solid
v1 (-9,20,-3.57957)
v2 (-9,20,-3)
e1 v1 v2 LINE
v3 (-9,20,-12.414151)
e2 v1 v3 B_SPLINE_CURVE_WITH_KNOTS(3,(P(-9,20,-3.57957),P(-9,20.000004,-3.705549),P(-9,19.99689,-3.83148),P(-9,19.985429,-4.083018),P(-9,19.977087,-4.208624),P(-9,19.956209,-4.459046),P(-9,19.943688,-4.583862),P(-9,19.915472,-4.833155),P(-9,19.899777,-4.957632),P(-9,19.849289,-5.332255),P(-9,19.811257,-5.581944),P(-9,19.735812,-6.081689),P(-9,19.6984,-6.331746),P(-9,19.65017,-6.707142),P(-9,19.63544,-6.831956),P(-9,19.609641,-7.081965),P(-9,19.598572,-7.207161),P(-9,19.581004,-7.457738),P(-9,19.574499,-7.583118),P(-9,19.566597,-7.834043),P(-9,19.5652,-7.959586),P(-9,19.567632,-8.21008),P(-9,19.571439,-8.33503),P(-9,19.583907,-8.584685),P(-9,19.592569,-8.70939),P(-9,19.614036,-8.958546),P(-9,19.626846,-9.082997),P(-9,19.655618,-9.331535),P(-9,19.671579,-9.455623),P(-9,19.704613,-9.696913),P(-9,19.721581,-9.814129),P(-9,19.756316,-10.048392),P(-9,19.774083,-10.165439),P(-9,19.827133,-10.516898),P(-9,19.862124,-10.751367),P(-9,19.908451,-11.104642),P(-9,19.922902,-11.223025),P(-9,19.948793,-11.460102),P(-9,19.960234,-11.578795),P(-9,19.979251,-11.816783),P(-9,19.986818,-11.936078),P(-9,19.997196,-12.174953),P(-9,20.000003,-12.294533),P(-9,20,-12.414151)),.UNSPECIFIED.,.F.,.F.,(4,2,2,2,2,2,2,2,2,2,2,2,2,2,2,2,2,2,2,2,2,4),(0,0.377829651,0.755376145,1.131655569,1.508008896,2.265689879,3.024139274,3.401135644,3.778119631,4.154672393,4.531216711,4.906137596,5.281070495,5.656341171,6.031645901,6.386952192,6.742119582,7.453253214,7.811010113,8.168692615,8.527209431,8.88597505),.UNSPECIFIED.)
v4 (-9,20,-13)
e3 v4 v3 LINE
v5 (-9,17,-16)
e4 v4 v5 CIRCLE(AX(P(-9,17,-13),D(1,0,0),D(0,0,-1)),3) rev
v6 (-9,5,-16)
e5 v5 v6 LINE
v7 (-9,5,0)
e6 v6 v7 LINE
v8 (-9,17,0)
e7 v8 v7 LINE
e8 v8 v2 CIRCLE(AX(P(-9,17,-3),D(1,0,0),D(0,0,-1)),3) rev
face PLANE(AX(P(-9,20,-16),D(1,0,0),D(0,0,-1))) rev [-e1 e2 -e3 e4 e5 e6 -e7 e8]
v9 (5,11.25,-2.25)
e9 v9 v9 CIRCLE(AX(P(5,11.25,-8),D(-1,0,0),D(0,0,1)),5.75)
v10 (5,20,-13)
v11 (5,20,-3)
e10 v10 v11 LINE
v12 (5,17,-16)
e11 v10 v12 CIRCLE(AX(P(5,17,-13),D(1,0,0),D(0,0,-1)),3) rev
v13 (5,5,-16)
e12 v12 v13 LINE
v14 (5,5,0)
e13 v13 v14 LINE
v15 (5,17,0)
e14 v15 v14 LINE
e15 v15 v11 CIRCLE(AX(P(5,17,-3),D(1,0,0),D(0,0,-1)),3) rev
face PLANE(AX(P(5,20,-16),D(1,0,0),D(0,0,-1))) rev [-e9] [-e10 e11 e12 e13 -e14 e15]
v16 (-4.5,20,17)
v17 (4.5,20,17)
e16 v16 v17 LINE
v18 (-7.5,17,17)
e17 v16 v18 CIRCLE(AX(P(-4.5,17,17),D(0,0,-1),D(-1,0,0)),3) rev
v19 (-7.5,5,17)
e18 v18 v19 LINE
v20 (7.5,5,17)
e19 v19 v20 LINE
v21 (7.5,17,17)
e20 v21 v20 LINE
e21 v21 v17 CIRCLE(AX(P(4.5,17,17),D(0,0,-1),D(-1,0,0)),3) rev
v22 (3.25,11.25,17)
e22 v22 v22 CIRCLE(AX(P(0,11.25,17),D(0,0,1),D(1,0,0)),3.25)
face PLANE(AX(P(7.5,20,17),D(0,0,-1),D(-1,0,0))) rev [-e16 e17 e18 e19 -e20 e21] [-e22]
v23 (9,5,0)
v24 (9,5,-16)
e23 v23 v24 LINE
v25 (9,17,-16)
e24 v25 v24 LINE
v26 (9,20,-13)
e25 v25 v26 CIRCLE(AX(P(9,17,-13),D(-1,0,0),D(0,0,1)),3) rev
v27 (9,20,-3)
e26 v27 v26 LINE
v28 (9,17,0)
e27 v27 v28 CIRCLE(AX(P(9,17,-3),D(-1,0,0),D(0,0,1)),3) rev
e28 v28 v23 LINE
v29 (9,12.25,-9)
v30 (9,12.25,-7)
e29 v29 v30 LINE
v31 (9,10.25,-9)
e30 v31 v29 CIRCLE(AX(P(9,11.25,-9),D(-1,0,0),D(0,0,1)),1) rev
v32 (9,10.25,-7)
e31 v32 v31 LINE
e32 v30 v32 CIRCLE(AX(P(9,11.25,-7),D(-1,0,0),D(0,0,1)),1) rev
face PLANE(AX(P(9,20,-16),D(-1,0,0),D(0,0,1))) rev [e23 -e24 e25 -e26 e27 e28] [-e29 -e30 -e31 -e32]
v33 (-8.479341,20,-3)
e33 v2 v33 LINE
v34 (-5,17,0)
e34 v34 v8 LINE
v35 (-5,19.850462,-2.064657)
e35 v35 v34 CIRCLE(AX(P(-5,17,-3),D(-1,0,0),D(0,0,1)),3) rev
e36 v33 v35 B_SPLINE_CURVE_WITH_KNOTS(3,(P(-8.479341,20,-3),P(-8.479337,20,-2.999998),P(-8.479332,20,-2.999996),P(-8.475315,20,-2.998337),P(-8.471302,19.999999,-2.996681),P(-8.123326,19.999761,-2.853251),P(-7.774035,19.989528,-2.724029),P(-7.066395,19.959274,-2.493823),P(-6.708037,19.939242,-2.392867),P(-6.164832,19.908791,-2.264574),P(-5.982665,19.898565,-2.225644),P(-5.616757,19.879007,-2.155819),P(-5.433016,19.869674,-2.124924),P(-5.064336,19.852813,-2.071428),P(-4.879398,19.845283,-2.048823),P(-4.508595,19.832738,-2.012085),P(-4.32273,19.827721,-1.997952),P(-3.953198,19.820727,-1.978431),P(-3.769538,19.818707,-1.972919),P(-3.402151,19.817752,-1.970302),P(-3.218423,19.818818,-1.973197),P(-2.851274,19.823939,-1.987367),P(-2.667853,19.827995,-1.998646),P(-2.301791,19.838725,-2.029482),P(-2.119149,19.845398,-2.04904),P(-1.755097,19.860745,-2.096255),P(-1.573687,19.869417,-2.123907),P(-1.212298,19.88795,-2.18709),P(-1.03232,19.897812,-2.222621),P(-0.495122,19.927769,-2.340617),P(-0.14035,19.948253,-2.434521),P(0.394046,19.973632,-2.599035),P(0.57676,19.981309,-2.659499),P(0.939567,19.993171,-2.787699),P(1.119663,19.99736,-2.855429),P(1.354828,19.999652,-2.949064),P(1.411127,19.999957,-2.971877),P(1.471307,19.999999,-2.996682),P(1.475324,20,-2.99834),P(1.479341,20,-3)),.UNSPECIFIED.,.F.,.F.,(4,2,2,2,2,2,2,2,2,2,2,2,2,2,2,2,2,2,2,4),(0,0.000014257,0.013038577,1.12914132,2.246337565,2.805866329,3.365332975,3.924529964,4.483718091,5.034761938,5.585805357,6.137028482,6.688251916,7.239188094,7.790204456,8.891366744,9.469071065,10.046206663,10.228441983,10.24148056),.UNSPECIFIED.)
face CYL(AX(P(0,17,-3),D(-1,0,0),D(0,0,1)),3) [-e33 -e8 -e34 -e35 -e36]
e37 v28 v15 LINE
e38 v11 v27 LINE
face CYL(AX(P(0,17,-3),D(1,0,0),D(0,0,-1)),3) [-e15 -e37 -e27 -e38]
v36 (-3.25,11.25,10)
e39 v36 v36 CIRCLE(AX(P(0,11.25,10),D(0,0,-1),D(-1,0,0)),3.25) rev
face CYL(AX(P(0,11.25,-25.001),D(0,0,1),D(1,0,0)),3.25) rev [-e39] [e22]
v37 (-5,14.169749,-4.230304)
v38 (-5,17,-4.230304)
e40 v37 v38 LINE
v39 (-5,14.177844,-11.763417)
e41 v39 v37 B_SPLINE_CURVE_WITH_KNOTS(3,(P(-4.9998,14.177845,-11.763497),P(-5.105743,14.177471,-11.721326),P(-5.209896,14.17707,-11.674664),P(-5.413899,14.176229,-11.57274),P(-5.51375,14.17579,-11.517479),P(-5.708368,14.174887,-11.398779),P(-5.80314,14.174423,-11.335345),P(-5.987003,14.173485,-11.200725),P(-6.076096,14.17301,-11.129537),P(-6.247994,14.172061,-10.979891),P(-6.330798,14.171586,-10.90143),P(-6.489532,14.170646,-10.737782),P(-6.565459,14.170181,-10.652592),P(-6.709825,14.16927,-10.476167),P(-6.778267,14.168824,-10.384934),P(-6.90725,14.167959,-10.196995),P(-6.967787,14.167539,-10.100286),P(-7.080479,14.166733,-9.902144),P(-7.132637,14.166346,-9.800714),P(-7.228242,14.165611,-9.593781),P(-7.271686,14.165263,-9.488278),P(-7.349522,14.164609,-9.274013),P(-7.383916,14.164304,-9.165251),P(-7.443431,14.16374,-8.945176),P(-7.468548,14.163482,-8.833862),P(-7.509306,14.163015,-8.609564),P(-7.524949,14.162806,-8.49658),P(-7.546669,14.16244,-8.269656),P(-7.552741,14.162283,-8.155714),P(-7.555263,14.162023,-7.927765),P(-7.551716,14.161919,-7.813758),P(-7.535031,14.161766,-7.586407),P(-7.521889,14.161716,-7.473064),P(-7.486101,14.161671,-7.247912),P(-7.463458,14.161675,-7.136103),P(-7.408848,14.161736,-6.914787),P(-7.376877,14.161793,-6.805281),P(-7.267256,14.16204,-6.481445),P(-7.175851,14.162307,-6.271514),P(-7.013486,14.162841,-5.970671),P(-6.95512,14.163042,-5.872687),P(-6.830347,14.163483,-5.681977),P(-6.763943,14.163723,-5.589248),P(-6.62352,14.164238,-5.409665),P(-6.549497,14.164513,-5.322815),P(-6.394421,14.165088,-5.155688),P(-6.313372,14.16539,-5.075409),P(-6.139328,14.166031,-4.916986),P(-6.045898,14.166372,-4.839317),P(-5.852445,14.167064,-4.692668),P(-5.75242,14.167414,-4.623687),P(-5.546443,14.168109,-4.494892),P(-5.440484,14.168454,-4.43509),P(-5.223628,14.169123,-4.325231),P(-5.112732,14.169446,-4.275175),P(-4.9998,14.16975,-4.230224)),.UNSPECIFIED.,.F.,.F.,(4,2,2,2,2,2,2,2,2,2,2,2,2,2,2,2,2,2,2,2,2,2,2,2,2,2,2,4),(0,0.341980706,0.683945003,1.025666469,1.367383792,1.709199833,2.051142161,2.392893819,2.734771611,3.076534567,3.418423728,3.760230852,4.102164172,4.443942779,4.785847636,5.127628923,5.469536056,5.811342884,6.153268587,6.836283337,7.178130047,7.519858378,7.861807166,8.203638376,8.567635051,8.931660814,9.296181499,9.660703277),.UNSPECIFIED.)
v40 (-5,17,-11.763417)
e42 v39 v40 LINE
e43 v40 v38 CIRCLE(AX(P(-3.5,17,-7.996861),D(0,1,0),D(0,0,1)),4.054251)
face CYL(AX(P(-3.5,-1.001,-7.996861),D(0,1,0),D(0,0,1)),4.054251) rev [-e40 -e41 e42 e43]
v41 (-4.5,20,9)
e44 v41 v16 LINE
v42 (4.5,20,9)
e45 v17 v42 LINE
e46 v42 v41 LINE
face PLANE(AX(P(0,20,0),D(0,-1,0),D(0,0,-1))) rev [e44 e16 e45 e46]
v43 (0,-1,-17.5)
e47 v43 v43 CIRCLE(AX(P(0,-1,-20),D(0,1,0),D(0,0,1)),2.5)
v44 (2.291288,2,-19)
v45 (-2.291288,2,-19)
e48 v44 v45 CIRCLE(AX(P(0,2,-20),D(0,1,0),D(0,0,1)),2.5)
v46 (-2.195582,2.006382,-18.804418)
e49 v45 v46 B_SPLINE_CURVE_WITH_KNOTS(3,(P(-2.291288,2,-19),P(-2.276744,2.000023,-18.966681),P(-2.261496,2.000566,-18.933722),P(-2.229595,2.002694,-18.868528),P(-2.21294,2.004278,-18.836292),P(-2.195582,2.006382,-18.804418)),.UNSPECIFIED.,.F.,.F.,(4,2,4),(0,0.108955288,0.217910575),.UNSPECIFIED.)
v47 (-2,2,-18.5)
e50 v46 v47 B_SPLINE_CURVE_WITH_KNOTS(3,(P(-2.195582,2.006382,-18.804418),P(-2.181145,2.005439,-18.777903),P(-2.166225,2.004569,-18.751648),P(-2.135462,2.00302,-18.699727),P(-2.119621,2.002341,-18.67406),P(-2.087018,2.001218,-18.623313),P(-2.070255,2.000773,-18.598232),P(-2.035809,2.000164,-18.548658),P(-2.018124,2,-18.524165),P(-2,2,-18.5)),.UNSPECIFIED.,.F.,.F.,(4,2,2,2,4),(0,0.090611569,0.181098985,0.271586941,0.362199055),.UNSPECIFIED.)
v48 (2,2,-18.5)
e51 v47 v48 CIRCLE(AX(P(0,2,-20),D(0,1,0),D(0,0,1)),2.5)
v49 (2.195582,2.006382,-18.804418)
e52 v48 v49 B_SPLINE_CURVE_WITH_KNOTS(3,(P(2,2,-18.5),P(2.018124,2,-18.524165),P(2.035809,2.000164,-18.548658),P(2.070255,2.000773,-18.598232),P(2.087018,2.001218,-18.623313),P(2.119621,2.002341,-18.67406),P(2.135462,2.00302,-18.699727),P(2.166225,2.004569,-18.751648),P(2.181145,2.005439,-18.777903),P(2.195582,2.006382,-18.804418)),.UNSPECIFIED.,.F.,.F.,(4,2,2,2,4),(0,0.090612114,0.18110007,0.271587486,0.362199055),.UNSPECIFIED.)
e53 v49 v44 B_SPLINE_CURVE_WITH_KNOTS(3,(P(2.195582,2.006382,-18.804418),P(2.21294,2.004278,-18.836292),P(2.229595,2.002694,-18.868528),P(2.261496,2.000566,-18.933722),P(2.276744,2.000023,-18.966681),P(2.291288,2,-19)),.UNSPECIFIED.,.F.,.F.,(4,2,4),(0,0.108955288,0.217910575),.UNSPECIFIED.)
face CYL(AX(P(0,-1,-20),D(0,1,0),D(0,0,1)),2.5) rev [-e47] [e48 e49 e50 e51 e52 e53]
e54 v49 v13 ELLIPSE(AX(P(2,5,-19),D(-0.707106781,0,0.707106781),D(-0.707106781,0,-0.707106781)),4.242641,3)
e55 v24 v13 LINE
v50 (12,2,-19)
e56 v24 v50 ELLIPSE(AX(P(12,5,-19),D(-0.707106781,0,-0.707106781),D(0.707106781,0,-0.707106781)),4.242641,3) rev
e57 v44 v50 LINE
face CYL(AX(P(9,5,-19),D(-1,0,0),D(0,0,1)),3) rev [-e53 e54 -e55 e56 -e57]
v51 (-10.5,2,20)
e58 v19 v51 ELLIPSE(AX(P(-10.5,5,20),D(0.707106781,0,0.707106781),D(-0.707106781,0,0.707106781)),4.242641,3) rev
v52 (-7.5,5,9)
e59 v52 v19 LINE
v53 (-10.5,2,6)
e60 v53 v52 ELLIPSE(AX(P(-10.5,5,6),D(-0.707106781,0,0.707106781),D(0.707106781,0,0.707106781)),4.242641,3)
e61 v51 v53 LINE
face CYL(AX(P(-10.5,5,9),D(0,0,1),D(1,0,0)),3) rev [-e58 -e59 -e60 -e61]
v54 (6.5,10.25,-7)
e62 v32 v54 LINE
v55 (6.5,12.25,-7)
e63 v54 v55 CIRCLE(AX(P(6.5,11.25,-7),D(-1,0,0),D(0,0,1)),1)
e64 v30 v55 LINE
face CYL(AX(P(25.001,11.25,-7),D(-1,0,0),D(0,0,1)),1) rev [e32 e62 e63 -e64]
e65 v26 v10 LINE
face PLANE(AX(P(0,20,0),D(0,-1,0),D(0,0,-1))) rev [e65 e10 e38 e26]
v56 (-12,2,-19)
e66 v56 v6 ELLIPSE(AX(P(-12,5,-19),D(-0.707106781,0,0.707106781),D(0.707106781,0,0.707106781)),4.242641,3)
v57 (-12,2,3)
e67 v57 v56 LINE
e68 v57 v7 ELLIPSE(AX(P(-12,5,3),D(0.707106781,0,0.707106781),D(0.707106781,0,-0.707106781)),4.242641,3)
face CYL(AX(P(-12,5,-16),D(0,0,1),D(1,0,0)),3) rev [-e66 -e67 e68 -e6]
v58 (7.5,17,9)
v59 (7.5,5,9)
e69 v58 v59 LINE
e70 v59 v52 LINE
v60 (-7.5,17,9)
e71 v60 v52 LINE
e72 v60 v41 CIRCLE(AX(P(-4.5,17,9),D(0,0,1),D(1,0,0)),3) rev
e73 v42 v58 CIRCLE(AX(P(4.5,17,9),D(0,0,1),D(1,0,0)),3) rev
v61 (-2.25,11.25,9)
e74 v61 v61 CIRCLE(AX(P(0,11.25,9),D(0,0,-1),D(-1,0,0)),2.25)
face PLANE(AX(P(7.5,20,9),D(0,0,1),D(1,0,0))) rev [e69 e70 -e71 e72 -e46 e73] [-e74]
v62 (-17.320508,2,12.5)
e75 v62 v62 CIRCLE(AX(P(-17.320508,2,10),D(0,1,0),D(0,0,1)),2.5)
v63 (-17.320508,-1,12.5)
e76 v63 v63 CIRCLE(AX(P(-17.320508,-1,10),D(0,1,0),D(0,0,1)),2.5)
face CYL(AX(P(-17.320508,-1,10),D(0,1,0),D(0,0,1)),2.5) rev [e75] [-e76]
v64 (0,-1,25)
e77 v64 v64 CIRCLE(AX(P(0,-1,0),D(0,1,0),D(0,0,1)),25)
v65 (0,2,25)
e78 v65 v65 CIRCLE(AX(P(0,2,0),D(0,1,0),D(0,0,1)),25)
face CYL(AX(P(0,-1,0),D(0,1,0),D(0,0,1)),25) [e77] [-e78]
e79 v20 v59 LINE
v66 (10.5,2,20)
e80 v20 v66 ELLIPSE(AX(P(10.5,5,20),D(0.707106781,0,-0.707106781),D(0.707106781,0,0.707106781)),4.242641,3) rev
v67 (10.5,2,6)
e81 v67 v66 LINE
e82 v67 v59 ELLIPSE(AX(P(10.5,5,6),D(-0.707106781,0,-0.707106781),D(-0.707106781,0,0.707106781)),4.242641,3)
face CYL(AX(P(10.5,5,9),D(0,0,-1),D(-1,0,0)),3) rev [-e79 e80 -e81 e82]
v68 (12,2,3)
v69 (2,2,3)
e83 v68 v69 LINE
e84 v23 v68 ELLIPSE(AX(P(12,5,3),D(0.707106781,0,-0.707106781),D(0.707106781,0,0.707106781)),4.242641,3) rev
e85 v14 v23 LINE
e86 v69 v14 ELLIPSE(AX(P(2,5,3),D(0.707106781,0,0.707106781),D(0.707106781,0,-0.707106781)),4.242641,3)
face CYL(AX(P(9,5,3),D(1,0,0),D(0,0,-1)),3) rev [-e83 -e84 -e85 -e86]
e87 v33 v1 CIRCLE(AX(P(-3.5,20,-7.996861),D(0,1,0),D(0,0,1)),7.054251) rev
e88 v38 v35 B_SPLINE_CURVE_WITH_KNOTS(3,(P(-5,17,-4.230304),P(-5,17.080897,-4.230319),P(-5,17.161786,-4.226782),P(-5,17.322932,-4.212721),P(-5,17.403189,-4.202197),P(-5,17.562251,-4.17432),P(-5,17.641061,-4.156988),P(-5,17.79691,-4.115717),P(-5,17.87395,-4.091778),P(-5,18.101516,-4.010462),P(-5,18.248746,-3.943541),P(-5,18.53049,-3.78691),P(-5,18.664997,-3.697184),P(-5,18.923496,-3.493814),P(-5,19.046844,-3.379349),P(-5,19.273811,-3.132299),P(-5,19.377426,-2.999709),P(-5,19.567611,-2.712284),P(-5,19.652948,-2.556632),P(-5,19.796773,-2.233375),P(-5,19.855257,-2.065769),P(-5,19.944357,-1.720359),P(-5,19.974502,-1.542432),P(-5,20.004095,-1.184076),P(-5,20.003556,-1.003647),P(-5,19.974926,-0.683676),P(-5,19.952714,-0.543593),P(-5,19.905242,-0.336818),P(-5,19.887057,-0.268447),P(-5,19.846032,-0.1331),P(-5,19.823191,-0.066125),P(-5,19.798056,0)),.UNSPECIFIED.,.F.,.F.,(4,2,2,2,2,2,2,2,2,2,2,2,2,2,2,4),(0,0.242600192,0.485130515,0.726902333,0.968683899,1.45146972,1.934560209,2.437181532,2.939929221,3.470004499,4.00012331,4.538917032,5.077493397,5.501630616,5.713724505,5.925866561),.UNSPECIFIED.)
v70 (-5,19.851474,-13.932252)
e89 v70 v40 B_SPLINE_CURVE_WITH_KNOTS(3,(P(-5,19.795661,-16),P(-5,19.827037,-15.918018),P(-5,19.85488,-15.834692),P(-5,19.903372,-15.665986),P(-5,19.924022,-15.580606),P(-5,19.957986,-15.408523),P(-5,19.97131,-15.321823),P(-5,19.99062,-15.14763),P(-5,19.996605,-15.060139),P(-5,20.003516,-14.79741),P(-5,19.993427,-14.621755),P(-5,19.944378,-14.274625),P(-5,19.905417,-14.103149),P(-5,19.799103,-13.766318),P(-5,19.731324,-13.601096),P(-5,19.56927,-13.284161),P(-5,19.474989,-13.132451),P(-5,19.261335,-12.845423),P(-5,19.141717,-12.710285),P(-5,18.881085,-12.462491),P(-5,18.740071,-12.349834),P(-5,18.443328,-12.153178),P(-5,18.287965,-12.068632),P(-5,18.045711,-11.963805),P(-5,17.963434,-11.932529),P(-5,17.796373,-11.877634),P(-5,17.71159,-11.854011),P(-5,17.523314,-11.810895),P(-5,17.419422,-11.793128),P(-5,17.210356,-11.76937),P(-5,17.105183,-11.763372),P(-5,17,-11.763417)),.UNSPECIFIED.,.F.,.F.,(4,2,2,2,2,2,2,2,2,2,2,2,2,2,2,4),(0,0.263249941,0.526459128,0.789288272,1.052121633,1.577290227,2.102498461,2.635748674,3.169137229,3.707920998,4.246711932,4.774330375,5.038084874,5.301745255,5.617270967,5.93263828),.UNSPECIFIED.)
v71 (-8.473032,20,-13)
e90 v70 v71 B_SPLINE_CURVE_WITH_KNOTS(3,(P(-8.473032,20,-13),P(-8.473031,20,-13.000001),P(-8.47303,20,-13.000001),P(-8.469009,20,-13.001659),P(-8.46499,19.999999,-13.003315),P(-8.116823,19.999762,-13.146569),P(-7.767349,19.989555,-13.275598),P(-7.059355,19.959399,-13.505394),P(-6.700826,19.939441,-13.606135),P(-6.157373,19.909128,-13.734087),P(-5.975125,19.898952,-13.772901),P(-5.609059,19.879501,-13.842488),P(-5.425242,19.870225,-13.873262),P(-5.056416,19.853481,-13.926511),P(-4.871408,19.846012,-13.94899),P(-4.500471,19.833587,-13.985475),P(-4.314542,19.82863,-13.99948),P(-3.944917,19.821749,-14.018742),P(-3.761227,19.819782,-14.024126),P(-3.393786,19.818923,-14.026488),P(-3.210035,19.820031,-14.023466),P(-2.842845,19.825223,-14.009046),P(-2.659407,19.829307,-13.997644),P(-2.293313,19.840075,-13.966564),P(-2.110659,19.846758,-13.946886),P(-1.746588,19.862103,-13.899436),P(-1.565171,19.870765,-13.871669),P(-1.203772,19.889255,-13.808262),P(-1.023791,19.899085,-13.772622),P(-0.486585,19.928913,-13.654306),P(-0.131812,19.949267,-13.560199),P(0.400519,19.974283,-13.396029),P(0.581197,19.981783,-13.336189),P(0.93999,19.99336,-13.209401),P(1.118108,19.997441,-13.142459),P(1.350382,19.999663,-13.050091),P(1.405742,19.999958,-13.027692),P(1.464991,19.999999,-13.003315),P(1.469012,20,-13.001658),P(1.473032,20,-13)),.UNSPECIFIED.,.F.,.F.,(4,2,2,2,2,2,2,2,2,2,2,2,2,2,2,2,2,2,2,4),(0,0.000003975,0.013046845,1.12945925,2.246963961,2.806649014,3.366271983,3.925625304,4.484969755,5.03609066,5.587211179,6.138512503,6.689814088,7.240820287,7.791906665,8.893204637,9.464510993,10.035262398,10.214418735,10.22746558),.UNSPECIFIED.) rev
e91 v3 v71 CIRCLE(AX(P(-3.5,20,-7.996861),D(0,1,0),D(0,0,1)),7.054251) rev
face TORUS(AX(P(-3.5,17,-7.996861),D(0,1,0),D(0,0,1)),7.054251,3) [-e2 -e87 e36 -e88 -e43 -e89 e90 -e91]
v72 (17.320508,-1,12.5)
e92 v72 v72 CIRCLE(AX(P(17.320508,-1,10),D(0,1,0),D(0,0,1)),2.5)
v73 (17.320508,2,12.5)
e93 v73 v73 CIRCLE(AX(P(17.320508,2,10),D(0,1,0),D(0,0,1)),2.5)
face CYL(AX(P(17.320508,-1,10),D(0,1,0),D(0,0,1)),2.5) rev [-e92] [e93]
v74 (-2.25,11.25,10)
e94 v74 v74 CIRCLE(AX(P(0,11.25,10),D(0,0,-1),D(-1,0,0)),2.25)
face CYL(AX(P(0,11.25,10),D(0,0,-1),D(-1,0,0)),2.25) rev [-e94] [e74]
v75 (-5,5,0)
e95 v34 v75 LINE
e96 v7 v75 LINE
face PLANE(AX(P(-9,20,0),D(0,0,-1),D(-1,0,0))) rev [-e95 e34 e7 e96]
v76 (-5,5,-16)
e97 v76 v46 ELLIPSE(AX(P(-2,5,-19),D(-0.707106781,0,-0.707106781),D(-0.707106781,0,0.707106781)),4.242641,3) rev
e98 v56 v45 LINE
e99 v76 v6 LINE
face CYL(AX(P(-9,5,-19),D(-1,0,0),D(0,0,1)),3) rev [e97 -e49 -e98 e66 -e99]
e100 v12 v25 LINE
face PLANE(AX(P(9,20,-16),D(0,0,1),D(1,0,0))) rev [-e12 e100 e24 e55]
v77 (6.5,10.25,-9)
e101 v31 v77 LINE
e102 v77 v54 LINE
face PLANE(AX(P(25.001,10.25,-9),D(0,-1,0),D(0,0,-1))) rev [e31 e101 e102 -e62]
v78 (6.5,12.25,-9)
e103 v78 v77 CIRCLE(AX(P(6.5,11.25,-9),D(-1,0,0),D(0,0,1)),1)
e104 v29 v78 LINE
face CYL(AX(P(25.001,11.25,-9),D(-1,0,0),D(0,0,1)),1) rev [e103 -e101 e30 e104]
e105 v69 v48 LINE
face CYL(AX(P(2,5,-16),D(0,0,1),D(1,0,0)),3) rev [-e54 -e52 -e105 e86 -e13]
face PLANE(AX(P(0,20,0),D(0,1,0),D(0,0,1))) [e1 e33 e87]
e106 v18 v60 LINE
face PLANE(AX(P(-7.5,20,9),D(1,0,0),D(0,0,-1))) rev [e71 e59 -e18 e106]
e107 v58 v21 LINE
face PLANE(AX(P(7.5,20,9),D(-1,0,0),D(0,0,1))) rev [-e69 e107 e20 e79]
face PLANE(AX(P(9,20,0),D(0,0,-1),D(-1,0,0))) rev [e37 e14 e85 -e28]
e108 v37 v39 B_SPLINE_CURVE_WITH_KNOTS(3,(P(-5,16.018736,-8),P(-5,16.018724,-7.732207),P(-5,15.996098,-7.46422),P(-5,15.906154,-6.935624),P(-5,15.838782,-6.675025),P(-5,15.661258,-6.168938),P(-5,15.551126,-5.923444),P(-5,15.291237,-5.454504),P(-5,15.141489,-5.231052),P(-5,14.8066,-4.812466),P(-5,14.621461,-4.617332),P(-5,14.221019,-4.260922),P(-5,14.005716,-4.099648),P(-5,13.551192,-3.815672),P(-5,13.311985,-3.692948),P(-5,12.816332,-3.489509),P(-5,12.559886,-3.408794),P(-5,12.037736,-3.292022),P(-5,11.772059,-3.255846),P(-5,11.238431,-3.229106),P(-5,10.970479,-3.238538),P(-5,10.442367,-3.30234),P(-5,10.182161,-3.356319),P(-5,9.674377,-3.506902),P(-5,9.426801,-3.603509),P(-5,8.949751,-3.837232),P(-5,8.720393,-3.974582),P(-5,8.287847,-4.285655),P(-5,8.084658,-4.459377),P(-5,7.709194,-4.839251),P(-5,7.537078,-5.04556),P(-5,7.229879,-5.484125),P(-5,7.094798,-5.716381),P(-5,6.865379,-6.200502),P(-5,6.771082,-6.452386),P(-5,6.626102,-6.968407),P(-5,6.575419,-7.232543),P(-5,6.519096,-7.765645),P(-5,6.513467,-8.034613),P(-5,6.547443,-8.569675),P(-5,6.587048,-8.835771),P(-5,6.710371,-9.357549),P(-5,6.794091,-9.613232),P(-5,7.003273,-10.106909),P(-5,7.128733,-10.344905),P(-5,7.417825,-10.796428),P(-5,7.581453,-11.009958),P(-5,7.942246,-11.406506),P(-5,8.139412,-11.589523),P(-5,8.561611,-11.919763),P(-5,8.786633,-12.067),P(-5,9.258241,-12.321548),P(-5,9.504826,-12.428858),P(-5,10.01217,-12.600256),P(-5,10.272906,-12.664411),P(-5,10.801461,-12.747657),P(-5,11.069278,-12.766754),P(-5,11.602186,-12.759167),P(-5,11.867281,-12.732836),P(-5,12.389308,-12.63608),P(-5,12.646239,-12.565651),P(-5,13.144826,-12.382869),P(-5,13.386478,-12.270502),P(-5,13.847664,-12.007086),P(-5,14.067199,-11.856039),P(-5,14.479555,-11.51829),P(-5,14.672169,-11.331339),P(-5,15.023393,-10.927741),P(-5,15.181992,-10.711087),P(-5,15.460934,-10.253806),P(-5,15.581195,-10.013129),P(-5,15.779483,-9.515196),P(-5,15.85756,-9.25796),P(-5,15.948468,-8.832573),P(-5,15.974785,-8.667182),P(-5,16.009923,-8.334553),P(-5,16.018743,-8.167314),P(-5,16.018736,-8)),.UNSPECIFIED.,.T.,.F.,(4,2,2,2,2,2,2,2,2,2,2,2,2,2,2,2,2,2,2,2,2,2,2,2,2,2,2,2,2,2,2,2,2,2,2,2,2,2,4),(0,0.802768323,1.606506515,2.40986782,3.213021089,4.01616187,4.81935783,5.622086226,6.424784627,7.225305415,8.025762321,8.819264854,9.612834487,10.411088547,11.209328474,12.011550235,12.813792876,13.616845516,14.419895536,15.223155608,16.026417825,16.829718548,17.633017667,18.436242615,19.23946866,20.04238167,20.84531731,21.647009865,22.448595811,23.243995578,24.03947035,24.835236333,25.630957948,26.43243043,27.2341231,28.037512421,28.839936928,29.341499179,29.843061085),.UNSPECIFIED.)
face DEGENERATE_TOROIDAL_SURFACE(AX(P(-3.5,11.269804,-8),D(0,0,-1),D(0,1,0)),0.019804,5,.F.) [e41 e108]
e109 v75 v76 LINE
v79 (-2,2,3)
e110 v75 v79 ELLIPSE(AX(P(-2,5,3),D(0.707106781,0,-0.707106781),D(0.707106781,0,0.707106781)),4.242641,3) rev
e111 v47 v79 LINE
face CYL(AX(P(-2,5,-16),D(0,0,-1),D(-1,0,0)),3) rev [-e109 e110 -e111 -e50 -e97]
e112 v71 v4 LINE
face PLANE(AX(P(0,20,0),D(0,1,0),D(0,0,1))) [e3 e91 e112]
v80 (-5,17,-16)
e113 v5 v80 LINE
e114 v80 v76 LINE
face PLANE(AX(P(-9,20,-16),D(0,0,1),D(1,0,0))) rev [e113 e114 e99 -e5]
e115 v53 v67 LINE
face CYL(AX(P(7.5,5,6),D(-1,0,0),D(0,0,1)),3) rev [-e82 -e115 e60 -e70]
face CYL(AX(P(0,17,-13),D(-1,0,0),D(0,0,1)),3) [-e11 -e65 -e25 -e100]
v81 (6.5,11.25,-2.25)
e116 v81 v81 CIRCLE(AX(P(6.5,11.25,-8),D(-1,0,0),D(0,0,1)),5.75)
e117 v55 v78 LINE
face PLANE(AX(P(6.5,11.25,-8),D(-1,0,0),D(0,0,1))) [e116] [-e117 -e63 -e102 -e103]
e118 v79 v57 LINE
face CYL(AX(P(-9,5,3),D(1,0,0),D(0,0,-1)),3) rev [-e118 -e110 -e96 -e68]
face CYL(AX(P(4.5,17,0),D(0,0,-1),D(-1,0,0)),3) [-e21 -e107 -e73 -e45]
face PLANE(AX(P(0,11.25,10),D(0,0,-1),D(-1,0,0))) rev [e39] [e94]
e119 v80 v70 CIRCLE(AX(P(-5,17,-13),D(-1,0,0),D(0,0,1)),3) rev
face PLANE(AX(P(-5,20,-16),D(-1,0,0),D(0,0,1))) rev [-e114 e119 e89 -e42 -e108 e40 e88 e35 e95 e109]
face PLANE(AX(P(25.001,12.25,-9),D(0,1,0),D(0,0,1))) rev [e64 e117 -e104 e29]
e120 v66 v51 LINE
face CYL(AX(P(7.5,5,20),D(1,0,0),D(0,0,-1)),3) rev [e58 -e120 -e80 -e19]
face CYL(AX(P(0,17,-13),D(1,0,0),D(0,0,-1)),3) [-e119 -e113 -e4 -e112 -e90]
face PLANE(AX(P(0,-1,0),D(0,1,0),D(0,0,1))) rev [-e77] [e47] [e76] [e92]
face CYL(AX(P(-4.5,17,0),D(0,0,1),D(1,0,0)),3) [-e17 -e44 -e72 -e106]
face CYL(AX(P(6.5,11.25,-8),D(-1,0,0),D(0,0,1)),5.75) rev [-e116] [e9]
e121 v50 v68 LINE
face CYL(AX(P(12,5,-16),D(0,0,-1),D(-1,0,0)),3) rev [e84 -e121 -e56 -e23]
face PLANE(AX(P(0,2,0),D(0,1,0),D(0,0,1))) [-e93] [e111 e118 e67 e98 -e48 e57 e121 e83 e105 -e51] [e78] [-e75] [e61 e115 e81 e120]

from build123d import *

# Parameters (mm, degrees)
BOSS_EXTRUDE1_DEPTH      = 2
BOSS_EXTRUDE1_DEPTH_BACK = 1
SKETCH1_R                = 25
SKETCH1_R_2              = 2.5
SKETCH2_W                = 4
SKETCH2_H                = 16
BOSS_EXTRUDE2_DEPTH      = 18
SKETCH3_R                = 5.75
CUT_EXTRUDE1_DEPTH       = 1.5
CUT_REVOLVE1_ANGLE       = 180
CUT_EXTRUDE2_REACH       = 43.122
CUT_EXTRUDE3_REACH       = 46.914
FILLET1_R                = 3
SKETCH7_W                = 15
SKETCH7_H                = 8
BOSS_EXTRUDE3_DEPTH      = 18
CUT_EXTRUDE4_REACH       = 54.811
SKETCH8_R                = 3.25
BOSS_EXTRUDE4_START      = -1
SKETCH9_R                = 3.25
SKETCH9_R_2              = 2.25
BOSS_EXTRUDE4_DEPTH      = 1
FILLET2_R                = 3


with BuildPart() as part:
    # Sketch1 → Boss-Extrude1 (new, two sides: drawn at the far end of the back side and taken through both)
    with BuildSketch(Plane(origin=(0, 0, 0), x_dir=(1, 0, 0), z_dir=(0, 1, 0)).offset(-BOSS_EXTRUDE1_DEPTH_BACK)):
        with Locations(Location((0, 0, 0), (0, 0, 270))):
            Circle(SKETCH1_R)
        with Locations(Location((0, 20, 0), (0, 0, 270))):
            Circle(SKETCH1_R_2, mode=Mode.SUBTRACT)
        with Locations(Location((17.320508076, -10, 0), (0, 0, 270))):
            Circle(SKETCH1_R_2, mode=Mode.SUBTRACT)
        with Locations(Location((-17.320508076, -10, 0), (0, 0, 270))):
            Circle(SKETCH1_R_2, mode=Mode.SUBTRACT)
    extrude(amount=BOSS_EXTRUDE1_DEPTH + BOSS_EXTRUDE1_DEPTH_BACK)

    # Sketch2 → Boss-Extrude2 (add)
    with BuildSketch(Plane(origin=(0, 2, 0), x_dir=(1, 0, 0), z_dir=(0, 1, 0))):
        with Locations((7, 8)):
            Rectangle(SKETCH2_W, SKETCH2_H)
        with Locations((-7, 8)):
            Rectangle(SKETCH2_W, SKETCH2_H)
    extrude(amount=BOSS_EXTRUDE2_DEPTH)

    # Sketch3 → Cut-Extrude1 (cut)
    with BuildSketch(Plane.ZY.offset(-5)):
        with Locations((-8, 11.25)):
            Circle(SKETCH3_R)
    extrude(amount=-CUT_EXTRUDE1_DEPTH, mode=Mode.SUBTRACT)

    # Sketch4 → Cut-Revolve1 (revolve, cut)
    with BuildSketch(Plane.ZY.offset(3.5)):
        with BuildLine():
            Line((-3.000039219, 11.269803747), (-12.999960781, 11.269803747))
            ThreePointArc((-12.999960781, 11.269803747), (-8, 16.25), (-3.000039219, 11.269803747))
        make_face()
    revolve(axis=Axis((-3.5, 11.269803747, -3.000039219), (0, 0, 1)), revolution_arc=CUT_REVOLVE1_ANGLE, mode=Mode.SUBTRACT)

    # Sketch5 → Cut-Extrude2 (cut, up to next)
    with BuildSketch(Plane(origin=(0, 20, 0), x_dir=(1, 0, 0), z_dir=(0, 1, 0)), mode=Mode.PRIVATE) as cut_extrude2_sk1:
        with BuildLine():
            Line((-5, 11.763417337), (-5, 4.230303993))
            ThreePointArc((-5, 4.230303993), (-7.554250753, 7.996860665), (-5, 11.763417337))
        make_face()
    cut_extrude2_tool1 = extrude(cut_extrude2_sk1.sketch, amount=-CUT_EXTRUDE2_REACH, mode=Mode.PRIVATE) & part.part
    add(cut_extrude2_tool1.solids().sort_by_distance((-6.055552, 20, -7.996861))[0], mode=Mode.SUBTRACT)

    # Sketch6 → Cut-Extrude3 (cut, up to next)
    with BuildSketch(Plane.ZY.offset(-6.5), mode=Mode.PRIVATE) as cut_extrude3_sk1:
        with BuildLine():
            Line((-9, 12.25), (-7, 12.25))
            ThreePointArc((-7, 12.25), (-6, 11.25), (-7, 10.25))
            Line((-7, 10.25), (-9, 10.25))
            ThreePointArc((-9, 10.25), (-10, 11.25), (-9, 12.25))
        make_face()
    cut_extrude3_tool1 = extrude(cut_extrude3_sk1.sketch, amount=-CUT_EXTRUDE3_REACH, mode=Mode.PRIVATE) & part.part
    add(cut_extrude3_tool1.solids().sort_by_distance((6.5, 11.25, -8))[0], mode=Mode.SUBTRACT)

    # Fillet1
    # the kernel refuses this fillet: 3 mm, written as the material it adds along each edge
    with BuildSketch(Plane(origin=(5, 2, -16), x_dir=(0, 0, -1), z_dir=(1, 0, 0)), Plane(origin=(-9, 2, -16), x_dir=(0, 0, -1), z_dir=(1, 0, 0)), Plane(origin=(9, 2, 0), x_dir=(0, 0, 1), z_dir=(-1, 0, 0)), Plane(origin=(-5, 2, 0), x_dir=(0, 0, 1), z_dir=(-1, 0, 0))) as fillet1_piece_1:
        with BuildLine():
            CenterArc((FILLET1_R, FILLET1_R), FILLET1_R, 180, 90)
            Line((0, FILLET1_R), (0, 0))
            Line((0, 0), (FILLET1_R, 0))
        make_face()
    extrude(amount=4)
    with BuildSketch(Plane(origin=(9, 2, -16), x_dir=(1, 0, 0), z_dir=(0, 0, 1)), Plane(origin=(5, 2, 0), x_dir=(-1, 0, 0), z_dir=(0, 0, -1)), Plane(origin=(-5, 2, -16), x_dir=(1, 0, 0), z_dir=(0, 0, 1)), Plane(origin=(-9, 2, 0), x_dir=(-1, 0, 0), z_dir=(0, 0, -1))) as fillet1_piece_2:
        with BuildLine():
            CenterArc((FILLET1_R, FILLET1_R), FILLET1_R, 180, 90)
            Line((0, FILLET1_R), (0, 0))
            Line((0, 0), (FILLET1_R, 0))
        make_face()
    extrude(amount=16)
    with BuildSketch(Plane(origin=(-2.5, 2, -16), x_dir=(0, 0, -1), z_dir=(1, 0, 0))) as fillet1_piece_3a_section:
        with BuildLine():
            CenterArc((FILLET1_R, FILLET1_R), FILLET1_R, 180, 90)
            Line((0, FILLET1_R), (0, 0))
            Line((0, 0), (FILLET1_R, 0))
        make_face()
    fillet1_piece_3a = extrude(amount=11.5, mode=Mode.PRIVATE)
    fillet1_piece_3a = fillet1_piece_3a - Plane(origin=(0, 2.708264554, -20), x_dir=(0, 0, 1), z_dir=(0, -1, 0)) * Cylinder(2.5, 35, mode=Mode.PRIVATE)
    fillet1_piece_3a = split(fillet1_piece_3a, bisect_by=Plane(origin=(5, 2.708264554, -16.611938718), z_dir=(-1, 0, 0)), keep=Keep.TOP, mode=Mode.PRIVATE)
    with BuildSketch(Plane(origin=(5, 2, 0), x_dir=(-1, 0, 0), z_dir=(0, 0, -1))) as fillet1_piece_3b_section:
        with BuildLine():
            CenterArc((FILLET1_R, FILLET1_R), FILLET1_R, 180, 90)
            Line((0, FILLET1_R), (0, 0))
            Line((0, 0), (FILLET1_R, 0))
        make_face()
    fillet1_piece_3b = extrude(amount=23.5, mode=Mode.PRIVATE)
    fillet1_piece_3b = fillet1_piece_3b - Plane(origin=(0, 2.682108515, -20), x_dir=(0, 0, 1), z_dir=(0, -1, 0)) * Cylinder(2.5, 59, mode=Mode.PRIVATE)
    fillet1_piece_3b = split(fillet1_piece_3b, bisect_by=Plane(origin=(4.329541602, 2.682108515, -16), z_dir=(0, 0, -1)), keep=Keep.TOP, mode=Mode.PRIVATE)
    fillet1_piece_3 = fillet1_piece_3a & fillet1_piece_3b
    add(fillet1_piece_3)
    with BuildSketch(Plane(origin=(9, 2, -23.5), x_dir=(1, 0, 0), z_dir=(0, 0, 1))) as fillet1_piece_4a_section:
        with BuildLine():
            CenterArc((FILLET1_R, FILLET1_R), FILLET1_R, 180, 90)
            Line((0, FILLET1_R), (0, 0))
            Line((0, 0), (FILLET1_R, 0))
        make_face()
    fillet1_piece_4a = extrude(amount=23.5, mode=Mode.PRIVATE)
    fillet1_piece_4a = fillet1_piece_4a & Plane(origin=(0, 2.69431261, 0), x_dir=(0, 0, 1), z_dir=(0, -1, 0)) * Cylinder(25, 59, mode=Mode.PRIVATE)
    fillet1_piece_4a = split(fillet1_piece_4a, bisect_by=Plane(origin=(9.653084962, 2.69431261, -16), z_dir=(0, 0, -1)), keep=Keep.TOP, mode=Mode.PRIVATE)
    with BuildSketch(Plane(origin=(5, 2, -16), x_dir=(0, 0, -1), z_dir=(1, 0, 0))) as fillet1_piece_4b_section:
        with BuildLine():
            CenterArc((FILLET1_R, FILLET1_R), FILLET1_R, 180, 90)
            Line((0, FILLET1_R), (0, 0))
            Line((0, 0), (FILLET1_R, 0))
        make_face()
    fillet1_piece_4b = extrude(amount=11.5, mode=Mode.PRIVATE)
    fillet1_piece_4b = fillet1_piece_4b & Plane(origin=(0, 2.679254462, 0), x_dir=(0, 0, 1), z_dir=(0, -1, 0)) * Cylinder(25, 35, mode=Mode.PRIVATE)
    fillet1_piece_4b = split(fillet1_piece_4b, bisect_by=Plane(origin=(9, 2.679254462, -16.678966139), z_dir=(1, 0, 0)), keep=Keep.TOP, mode=Mode.PRIVATE)
    fillet1_piece_4 = fillet1_piece_4a & fillet1_piece_4b
    add(fillet1_piece_4)
    with BuildSketch(Plane(origin=(9, 2, -16), x_dir=(1, 0, 0), z_dir=(0, 0, 1))) as fillet1_piece_5a_section:
        with BuildLine():
            CenterArc((FILLET1_R, FILLET1_R), FILLET1_R, 180, 90)
            Line((0, FILLET1_R), (0, 0))
            Line((0, 0), (FILLET1_R, 0))
        make_face()
    fillet1_piece_5a = extrude(amount=23.5, mode=Mode.PRIVATE)
    fillet1_piece_5a = split(fillet1_piece_5a, bisect_by=Plane(origin=(9.679185343, 2.679185343, 0), z_dir=(0, 0, 1)), keep=Keep.TOP, mode=Mode.PRIVATE)
    with BuildSketch(Plane(origin=(16.5, 2, 0), x_dir=(0, 0, 1), z_dir=(-1, 0, 0))) as fillet1_piece_5b_section:
        with BuildLine():
            CenterArc((FILLET1_R, FILLET1_R), FILLET1_R, 180, 90)
            Line((0, FILLET1_R), (0, 0))
            Line((0, 0), (FILLET1_R, 0))
        make_face()
    fillet1_piece_5b = extrude(amount=11.5, mode=Mode.PRIVATE)
    fillet1_piece_5b = split(fillet1_piece_5b, bisect_by=Plane(origin=(9, 2.679185343, 0.679185343), z_dir=(1, 0, 0)), keep=Keep.TOP, mode=Mode.PRIVATE)
    fillet1_piece_5 = fillet1_piece_5a & fillet1_piece_5b
    add(fillet1_piece_5)
    with BuildSketch(Plane(origin=(5, 2, 7.5), x_dir=(-1, 0, 0), z_dir=(0, 0, -1))) as fillet1_piece_6a_section:
        with BuildLine():
            CenterArc((FILLET1_R, FILLET1_R), FILLET1_R, 180, 90)
            Line((0, FILLET1_R), (0, 0))
            Line((0, 0), (FILLET1_R, 0))
        make_face()
    fillet1_piece_6a = extrude(amount=23.5, mode=Mode.PRIVATE)
    fillet1_piece_6a = split(fillet1_piece_6a, bisect_by=Plane(origin=(4.320814657, 2.679185343, 0), z_dir=(0, 0, 1)), keep=Keep.TOP, mode=Mode.PRIVATE)
    with BuildSketch(Plane(origin=(9, 2, 0), x_dir=(0, 0, 1), z_dir=(-1, 0, 0))) as fillet1_piece_6b_section:
        with BuildLine():
            CenterArc((FILLET1_R, FILLET1_R), FILLET1_R, 180, 90)
            Line((0, FILLET1_R), (0, 0))
            Line((0, 0), (FILLET1_R, 0))
        make_face()
    fillet1_piece_6b = extrude(amount=11.5, mode=Mode.PRIVATE)
    fillet1_piece_6b = split(fillet1_piece_6b, bisect_by=Plane(origin=(5, 2.679185343, 0.679185343), z_dir=(-1, 0, 0)), keep=Keep.TOP, mode=Mode.PRIVATE)
    fillet1_piece_6 = fillet1_piece_6a & fillet1_piece_6b
    add(fillet1_piece_6)
    with BuildSketch(Plane(origin=(-9, 2, 0), x_dir=(-1, 0, 0), z_dir=(0, 0, -1))) as fillet1_piece_7a_section:
        with BuildLine():
            CenterArc((FILLET1_R, FILLET1_R), FILLET1_R, 180, 90)
            Line((0, FILLET1_R), (0, 0))
            Line((0, 0), (FILLET1_R, 0))
        make_face()
    fillet1_piece_7a = extrude(amount=23.5, mode=Mode.PRIVATE)
    fillet1_piece_7a = fillet1_piece_7a & Plane(origin=(0, 2.694311591, 0), x_dir=(0, 0, 1), z_dir=(0, -1, 0)) * Cylinder(25, 59, mode=Mode.PRIVATE)
    fillet1_piece_7a = split(fillet1_piece_7a, bisect_by=Plane(origin=(-9.653081328, 2.694311591, -16), z_dir=(0, 0, -1)), keep=Keep.TOP, mode=Mode.PRIVATE)
    with BuildSketch(Plane(origin=(-16.5, 2, -16), x_dir=(0, 0, -1), z_dir=(1, 0, 0))) as fillet1_piece_7b_section:
        with BuildLine():
            CenterArc((FILLET1_R, FILLET1_R), FILLET1_R, 180, 90)
            Line((0, FILLET1_R), (0, 0))
            Line((0, 0), (FILLET1_R, 0))
        make_face()
    fillet1_piece_7b = extrude(amount=11.5, mode=Mode.PRIVATE)
    fillet1_piece_7b = fillet1_piece_7b & Plane(origin=(0, 2.679254462, 0), x_dir=(0, 0, 1), z_dir=(0, -1, 0)) * Cylinder(25, 35, mode=Mode.PRIVATE)
    fillet1_piece_7b = split(fillet1_piece_7b, bisect_by=Plane(origin=(-9, 2.679254462, -16.678966139), z_dir=(-1, 0, 0)), keep=Keep.TOP, mode=Mode.PRIVATE)
    fillet1_piece_7 = fillet1_piece_7a & fillet1_piece_7b
    add(fillet1_piece_7)
    with BuildSketch(Plane(origin=(-5, 2, -23.5), x_dir=(1, 0, 0), z_dir=(0, 0, 1))) as fillet1_piece_8a_section:
        with BuildLine():
            CenterArc((FILLET1_R, FILLET1_R), FILLET1_R, 180, 90)
            Line((0, FILLET1_R), (0, 0))
            Line((0, 0), (FILLET1_R, 0))
        make_face()
    fillet1_piece_8a = extrude(amount=23.5, mode=Mode.PRIVATE)
    fillet1_piece_8a = fillet1_piece_8a - Plane(origin=(0, 2.682108515, -20), x_dir=(0, 0, 1), z_dir=(0, -1, 0)) * Cylinder(2.5, 59, mode=Mode.PRIVATE)
    fillet1_piece_8a = split(fillet1_piece_8a, bisect_by=Plane(origin=(-4.329541602, 2.682108515, -16), z_dir=(0, 0, -1)), keep=Keep.TOP, mode=Mode.PRIVATE)
    with BuildSketch(Plane(origin=(-9, 2, -16), x_dir=(0, 0, -1), z_dir=(1, 0, 0))) as fillet1_piece_8b_section:
        with BuildLine():
            CenterArc((FILLET1_R, FILLET1_R), FILLET1_R, 180, 90)
            Line((0, FILLET1_R), (0, 0))
            Line((0, 0), (FILLET1_R, 0))
        make_face()
    fillet1_piece_8b = extrude(amount=11.5, mode=Mode.PRIVATE)
    fillet1_piece_8b = fillet1_piece_8b - Plane(origin=(0, 2.708264539, -20), x_dir=(0, 0, 1), z_dir=(0, -1, 0)) * Cylinder(2.5, 35, mode=Mode.PRIVATE)
    fillet1_piece_8b = split(fillet1_piece_8b, bisect_by=Plane(origin=(-5, 2.708264539, -16.61193878), z_dir=(1, 0, 0)), keep=Keep.TOP, mode=Mode.PRIVATE)
    fillet1_piece_8 = fillet1_piece_8a & fillet1_piece_8b
    add(fillet1_piece_8)
    with BuildSketch(Plane(origin=(2.5, 2, 0), x_dir=(0, 0, 1), z_dir=(-1, 0, 0))) as fillet1_piece_9a_section:
        with BuildLine():
            CenterArc((FILLET1_R, FILLET1_R), FILLET1_R, 180, 90)
            Line((0, FILLET1_R), (0, 0))
            Line((0, 0), (FILLET1_R, 0))
        make_face()
    fillet1_piece_9a = extrude(amount=11.5, mode=Mode.PRIVATE)
    fillet1_piece_9a = split(fillet1_piece_9a, bisect_by=Plane(origin=(-5, 2.679185343, 0.679185343), z_dir=(1, 0, 0)), keep=Keep.TOP, mode=Mode.PRIVATE)
    with BuildSketch(Plane(origin=(-5, 2, -16), x_dir=(1, 0, 0), z_dir=(0, 0, 1))) as fillet1_piece_9b_section:
        with BuildLine():
            CenterArc((FILLET1_R, FILLET1_R), FILLET1_R, 180, 90)
            Line((0, FILLET1_R), (0, 0))
            Line((0, 0), (FILLET1_R, 0))
        make_face()
    fillet1_piece_9b = extrude(amount=23.5, mode=Mode.PRIVATE)
    fillet1_piece_9b = split(fillet1_piece_9b, bisect_by=Plane(origin=(-4.320814657, 2.679185343, 0), z_dir=(0, 0, 1)), keep=Keep.TOP, mode=Mode.PRIVATE)
    fillet1_piece_9 = fillet1_piece_9a & fillet1_piece_9b
    add(fillet1_piece_9)
    with BuildSketch(Plane(origin=(-9, 2, 7.5), x_dir=(-1, 0, 0), z_dir=(0, 0, -1))) as fillet1_piece_10a_section:
        with BuildLine():
            CenterArc((FILLET1_R, FILLET1_R), FILLET1_R, 180, 90)
            Line((0, FILLET1_R), (0, 0))
            Line((0, 0), (FILLET1_R, 0))
        make_face()
    fillet1_piece_10a = extrude(amount=23.5, mode=Mode.PRIVATE)
    fillet1_piece_10a = split(fillet1_piece_10a, bisect_by=Plane(origin=(-9.679185343, 2.679185343, 0), z_dir=(0, 0, 1)), keep=Keep.TOP, mode=Mode.PRIVATE)
    with BuildSketch(Plane(origin=(-5, 2, 0), x_dir=(0, 0, 1), z_dir=(-1, 0, 0))) as fillet1_piece_10b_section:
        with BuildLine():
            CenterArc((FILLET1_R, FILLET1_R), FILLET1_R, 180, 90)
            Line((0, FILLET1_R), (0, 0))
            Line((0, 0), (FILLET1_R, 0))
        make_face()
    fillet1_piece_10b = extrude(amount=11.5, mode=Mode.PRIVATE)
    fillet1_piece_10b = split(fillet1_piece_10b, bisect_by=Plane(origin=(-9, 2.679185343, 0.679185343), z_dir=(-1, 0, 0)), keep=Keep.TOP, mode=Mode.PRIVATE)
    fillet1_piece_10 = fillet1_piece_10a & fillet1_piece_10b
    add(fillet1_piece_10)
    # the kernel refuses this fillet: 3 mm, written as the material it takes off along each edge
    with BuildSketch(Plane(origin=(-3.5, 20, -7.996860665), x_dir=(0.9951857838683703, 0, 0.09800640584317669), z_dir=(0.09800640584317669, 0, -0.9951857838683703))) as fillet1_2_piece_1:
        with BuildLine():
            CenterArc((4.054250753 + FILLET1_R, FILLET1_R), FILLET1_R, 180, 90)
            Line((4.054250753, FILLET1_R), (4.054250753, 0))
            Line((4.054250753, 0), (4.054250753 + FILLET1_R, 0))
        make_face()
    revolve(axis=Axis((-3.5, 20, -7.996860665), (0, -1, 0)), revolution_arc=348.751236033, mode=Mode.SUBTRACT)
    with BuildSketch(Plane(origin=(-16.5, 20, -16), x_dir=(0, -1, 0), z_dir=(1, 0, 0)), Plane(origin=(2.5, 20, 0), x_dir=(0, -1, 0), z_dir=(-1, 0, 0)), Plane(origin=(-2.5, 20, -16), x_dir=(0, -1, 0), z_dir=(1, 0, 0)), Plane(origin=(16.5, 20, 0), x_dir=(0, -1, 0), z_dir=(-1, 0, 0))) as fillet1_2_piece_2:
        with BuildLine():
            CenterArc((FILLET1_R, -FILLET1_R), FILLET1_R, 90, 90)
            Line((0, -FILLET1_R), (0, 0))
            Line((0, 0), (FILLET1_R, 0))
        make_face()
    extrude(amount=19, mode=Mode.SUBTRACT)

    # Sketch7 → Boss-Extrude3 (add)
    with BuildSketch(Plane(origin=(0, 2, 0), x_dir=(1, 0, 0), z_dir=(0, 1, 0))):
        with Locations((0, -13)):
            Rectangle(SKETCH7_W, SKETCH7_H)
    extrude(amount=BOSS_EXTRUDE3_DEPTH)

    # Sketch8 → Cut-Extrude4 (cut, up to next)
    with BuildSketch(Plane.XY.offset(17), mode=Mode.PRIVATE) as cut_extrude4_sk1:
        with Locations((0, 11.25)):
            Circle(SKETCH8_R)
    cut_extrude4_tool1 = extrude(cut_extrude4_sk1.sketch, amount=-CUT_EXTRUDE4_REACH, mode=Mode.PRIVATE) & part.part
    add(cut_extrude4_tool1.solids().sort_by_distance((0, 11.25, 17))[0], mode=Mode.SUBTRACT)

    # Sketch9 → Boss-Extrude4 (add)
    with BuildSketch(Plane(origin=(0, 0, 9), x_dir=(-1, 0, 0), z_dir=(0, 0, -1)).offset(BOSS_EXTRUDE4_START)):
        with Locations(Location((0, 11.25, 0), (0, 0, 180))):
            Circle(SKETCH9_R)
        with Locations((0, 11.25)):
            Circle(SKETCH9_R_2, mode=Mode.SUBTRACT)
    extrude(amount=BOSS_EXTRUDE4_DEPTH)

    # Fillet2
    fillet2_edges = [part.edges().sort_by_distance(p)[0] for p in [
        (-7.5, 2, 13),
        (0, 2, 17),
        (7.5, 2, 13),
        (0, 2, 9),
        (-7.5, 20, 13),
        (7.5, 20, 13),
    ]]
    fillet(fillet2_edges, radius=FILLET2_R)


solid = part.part
